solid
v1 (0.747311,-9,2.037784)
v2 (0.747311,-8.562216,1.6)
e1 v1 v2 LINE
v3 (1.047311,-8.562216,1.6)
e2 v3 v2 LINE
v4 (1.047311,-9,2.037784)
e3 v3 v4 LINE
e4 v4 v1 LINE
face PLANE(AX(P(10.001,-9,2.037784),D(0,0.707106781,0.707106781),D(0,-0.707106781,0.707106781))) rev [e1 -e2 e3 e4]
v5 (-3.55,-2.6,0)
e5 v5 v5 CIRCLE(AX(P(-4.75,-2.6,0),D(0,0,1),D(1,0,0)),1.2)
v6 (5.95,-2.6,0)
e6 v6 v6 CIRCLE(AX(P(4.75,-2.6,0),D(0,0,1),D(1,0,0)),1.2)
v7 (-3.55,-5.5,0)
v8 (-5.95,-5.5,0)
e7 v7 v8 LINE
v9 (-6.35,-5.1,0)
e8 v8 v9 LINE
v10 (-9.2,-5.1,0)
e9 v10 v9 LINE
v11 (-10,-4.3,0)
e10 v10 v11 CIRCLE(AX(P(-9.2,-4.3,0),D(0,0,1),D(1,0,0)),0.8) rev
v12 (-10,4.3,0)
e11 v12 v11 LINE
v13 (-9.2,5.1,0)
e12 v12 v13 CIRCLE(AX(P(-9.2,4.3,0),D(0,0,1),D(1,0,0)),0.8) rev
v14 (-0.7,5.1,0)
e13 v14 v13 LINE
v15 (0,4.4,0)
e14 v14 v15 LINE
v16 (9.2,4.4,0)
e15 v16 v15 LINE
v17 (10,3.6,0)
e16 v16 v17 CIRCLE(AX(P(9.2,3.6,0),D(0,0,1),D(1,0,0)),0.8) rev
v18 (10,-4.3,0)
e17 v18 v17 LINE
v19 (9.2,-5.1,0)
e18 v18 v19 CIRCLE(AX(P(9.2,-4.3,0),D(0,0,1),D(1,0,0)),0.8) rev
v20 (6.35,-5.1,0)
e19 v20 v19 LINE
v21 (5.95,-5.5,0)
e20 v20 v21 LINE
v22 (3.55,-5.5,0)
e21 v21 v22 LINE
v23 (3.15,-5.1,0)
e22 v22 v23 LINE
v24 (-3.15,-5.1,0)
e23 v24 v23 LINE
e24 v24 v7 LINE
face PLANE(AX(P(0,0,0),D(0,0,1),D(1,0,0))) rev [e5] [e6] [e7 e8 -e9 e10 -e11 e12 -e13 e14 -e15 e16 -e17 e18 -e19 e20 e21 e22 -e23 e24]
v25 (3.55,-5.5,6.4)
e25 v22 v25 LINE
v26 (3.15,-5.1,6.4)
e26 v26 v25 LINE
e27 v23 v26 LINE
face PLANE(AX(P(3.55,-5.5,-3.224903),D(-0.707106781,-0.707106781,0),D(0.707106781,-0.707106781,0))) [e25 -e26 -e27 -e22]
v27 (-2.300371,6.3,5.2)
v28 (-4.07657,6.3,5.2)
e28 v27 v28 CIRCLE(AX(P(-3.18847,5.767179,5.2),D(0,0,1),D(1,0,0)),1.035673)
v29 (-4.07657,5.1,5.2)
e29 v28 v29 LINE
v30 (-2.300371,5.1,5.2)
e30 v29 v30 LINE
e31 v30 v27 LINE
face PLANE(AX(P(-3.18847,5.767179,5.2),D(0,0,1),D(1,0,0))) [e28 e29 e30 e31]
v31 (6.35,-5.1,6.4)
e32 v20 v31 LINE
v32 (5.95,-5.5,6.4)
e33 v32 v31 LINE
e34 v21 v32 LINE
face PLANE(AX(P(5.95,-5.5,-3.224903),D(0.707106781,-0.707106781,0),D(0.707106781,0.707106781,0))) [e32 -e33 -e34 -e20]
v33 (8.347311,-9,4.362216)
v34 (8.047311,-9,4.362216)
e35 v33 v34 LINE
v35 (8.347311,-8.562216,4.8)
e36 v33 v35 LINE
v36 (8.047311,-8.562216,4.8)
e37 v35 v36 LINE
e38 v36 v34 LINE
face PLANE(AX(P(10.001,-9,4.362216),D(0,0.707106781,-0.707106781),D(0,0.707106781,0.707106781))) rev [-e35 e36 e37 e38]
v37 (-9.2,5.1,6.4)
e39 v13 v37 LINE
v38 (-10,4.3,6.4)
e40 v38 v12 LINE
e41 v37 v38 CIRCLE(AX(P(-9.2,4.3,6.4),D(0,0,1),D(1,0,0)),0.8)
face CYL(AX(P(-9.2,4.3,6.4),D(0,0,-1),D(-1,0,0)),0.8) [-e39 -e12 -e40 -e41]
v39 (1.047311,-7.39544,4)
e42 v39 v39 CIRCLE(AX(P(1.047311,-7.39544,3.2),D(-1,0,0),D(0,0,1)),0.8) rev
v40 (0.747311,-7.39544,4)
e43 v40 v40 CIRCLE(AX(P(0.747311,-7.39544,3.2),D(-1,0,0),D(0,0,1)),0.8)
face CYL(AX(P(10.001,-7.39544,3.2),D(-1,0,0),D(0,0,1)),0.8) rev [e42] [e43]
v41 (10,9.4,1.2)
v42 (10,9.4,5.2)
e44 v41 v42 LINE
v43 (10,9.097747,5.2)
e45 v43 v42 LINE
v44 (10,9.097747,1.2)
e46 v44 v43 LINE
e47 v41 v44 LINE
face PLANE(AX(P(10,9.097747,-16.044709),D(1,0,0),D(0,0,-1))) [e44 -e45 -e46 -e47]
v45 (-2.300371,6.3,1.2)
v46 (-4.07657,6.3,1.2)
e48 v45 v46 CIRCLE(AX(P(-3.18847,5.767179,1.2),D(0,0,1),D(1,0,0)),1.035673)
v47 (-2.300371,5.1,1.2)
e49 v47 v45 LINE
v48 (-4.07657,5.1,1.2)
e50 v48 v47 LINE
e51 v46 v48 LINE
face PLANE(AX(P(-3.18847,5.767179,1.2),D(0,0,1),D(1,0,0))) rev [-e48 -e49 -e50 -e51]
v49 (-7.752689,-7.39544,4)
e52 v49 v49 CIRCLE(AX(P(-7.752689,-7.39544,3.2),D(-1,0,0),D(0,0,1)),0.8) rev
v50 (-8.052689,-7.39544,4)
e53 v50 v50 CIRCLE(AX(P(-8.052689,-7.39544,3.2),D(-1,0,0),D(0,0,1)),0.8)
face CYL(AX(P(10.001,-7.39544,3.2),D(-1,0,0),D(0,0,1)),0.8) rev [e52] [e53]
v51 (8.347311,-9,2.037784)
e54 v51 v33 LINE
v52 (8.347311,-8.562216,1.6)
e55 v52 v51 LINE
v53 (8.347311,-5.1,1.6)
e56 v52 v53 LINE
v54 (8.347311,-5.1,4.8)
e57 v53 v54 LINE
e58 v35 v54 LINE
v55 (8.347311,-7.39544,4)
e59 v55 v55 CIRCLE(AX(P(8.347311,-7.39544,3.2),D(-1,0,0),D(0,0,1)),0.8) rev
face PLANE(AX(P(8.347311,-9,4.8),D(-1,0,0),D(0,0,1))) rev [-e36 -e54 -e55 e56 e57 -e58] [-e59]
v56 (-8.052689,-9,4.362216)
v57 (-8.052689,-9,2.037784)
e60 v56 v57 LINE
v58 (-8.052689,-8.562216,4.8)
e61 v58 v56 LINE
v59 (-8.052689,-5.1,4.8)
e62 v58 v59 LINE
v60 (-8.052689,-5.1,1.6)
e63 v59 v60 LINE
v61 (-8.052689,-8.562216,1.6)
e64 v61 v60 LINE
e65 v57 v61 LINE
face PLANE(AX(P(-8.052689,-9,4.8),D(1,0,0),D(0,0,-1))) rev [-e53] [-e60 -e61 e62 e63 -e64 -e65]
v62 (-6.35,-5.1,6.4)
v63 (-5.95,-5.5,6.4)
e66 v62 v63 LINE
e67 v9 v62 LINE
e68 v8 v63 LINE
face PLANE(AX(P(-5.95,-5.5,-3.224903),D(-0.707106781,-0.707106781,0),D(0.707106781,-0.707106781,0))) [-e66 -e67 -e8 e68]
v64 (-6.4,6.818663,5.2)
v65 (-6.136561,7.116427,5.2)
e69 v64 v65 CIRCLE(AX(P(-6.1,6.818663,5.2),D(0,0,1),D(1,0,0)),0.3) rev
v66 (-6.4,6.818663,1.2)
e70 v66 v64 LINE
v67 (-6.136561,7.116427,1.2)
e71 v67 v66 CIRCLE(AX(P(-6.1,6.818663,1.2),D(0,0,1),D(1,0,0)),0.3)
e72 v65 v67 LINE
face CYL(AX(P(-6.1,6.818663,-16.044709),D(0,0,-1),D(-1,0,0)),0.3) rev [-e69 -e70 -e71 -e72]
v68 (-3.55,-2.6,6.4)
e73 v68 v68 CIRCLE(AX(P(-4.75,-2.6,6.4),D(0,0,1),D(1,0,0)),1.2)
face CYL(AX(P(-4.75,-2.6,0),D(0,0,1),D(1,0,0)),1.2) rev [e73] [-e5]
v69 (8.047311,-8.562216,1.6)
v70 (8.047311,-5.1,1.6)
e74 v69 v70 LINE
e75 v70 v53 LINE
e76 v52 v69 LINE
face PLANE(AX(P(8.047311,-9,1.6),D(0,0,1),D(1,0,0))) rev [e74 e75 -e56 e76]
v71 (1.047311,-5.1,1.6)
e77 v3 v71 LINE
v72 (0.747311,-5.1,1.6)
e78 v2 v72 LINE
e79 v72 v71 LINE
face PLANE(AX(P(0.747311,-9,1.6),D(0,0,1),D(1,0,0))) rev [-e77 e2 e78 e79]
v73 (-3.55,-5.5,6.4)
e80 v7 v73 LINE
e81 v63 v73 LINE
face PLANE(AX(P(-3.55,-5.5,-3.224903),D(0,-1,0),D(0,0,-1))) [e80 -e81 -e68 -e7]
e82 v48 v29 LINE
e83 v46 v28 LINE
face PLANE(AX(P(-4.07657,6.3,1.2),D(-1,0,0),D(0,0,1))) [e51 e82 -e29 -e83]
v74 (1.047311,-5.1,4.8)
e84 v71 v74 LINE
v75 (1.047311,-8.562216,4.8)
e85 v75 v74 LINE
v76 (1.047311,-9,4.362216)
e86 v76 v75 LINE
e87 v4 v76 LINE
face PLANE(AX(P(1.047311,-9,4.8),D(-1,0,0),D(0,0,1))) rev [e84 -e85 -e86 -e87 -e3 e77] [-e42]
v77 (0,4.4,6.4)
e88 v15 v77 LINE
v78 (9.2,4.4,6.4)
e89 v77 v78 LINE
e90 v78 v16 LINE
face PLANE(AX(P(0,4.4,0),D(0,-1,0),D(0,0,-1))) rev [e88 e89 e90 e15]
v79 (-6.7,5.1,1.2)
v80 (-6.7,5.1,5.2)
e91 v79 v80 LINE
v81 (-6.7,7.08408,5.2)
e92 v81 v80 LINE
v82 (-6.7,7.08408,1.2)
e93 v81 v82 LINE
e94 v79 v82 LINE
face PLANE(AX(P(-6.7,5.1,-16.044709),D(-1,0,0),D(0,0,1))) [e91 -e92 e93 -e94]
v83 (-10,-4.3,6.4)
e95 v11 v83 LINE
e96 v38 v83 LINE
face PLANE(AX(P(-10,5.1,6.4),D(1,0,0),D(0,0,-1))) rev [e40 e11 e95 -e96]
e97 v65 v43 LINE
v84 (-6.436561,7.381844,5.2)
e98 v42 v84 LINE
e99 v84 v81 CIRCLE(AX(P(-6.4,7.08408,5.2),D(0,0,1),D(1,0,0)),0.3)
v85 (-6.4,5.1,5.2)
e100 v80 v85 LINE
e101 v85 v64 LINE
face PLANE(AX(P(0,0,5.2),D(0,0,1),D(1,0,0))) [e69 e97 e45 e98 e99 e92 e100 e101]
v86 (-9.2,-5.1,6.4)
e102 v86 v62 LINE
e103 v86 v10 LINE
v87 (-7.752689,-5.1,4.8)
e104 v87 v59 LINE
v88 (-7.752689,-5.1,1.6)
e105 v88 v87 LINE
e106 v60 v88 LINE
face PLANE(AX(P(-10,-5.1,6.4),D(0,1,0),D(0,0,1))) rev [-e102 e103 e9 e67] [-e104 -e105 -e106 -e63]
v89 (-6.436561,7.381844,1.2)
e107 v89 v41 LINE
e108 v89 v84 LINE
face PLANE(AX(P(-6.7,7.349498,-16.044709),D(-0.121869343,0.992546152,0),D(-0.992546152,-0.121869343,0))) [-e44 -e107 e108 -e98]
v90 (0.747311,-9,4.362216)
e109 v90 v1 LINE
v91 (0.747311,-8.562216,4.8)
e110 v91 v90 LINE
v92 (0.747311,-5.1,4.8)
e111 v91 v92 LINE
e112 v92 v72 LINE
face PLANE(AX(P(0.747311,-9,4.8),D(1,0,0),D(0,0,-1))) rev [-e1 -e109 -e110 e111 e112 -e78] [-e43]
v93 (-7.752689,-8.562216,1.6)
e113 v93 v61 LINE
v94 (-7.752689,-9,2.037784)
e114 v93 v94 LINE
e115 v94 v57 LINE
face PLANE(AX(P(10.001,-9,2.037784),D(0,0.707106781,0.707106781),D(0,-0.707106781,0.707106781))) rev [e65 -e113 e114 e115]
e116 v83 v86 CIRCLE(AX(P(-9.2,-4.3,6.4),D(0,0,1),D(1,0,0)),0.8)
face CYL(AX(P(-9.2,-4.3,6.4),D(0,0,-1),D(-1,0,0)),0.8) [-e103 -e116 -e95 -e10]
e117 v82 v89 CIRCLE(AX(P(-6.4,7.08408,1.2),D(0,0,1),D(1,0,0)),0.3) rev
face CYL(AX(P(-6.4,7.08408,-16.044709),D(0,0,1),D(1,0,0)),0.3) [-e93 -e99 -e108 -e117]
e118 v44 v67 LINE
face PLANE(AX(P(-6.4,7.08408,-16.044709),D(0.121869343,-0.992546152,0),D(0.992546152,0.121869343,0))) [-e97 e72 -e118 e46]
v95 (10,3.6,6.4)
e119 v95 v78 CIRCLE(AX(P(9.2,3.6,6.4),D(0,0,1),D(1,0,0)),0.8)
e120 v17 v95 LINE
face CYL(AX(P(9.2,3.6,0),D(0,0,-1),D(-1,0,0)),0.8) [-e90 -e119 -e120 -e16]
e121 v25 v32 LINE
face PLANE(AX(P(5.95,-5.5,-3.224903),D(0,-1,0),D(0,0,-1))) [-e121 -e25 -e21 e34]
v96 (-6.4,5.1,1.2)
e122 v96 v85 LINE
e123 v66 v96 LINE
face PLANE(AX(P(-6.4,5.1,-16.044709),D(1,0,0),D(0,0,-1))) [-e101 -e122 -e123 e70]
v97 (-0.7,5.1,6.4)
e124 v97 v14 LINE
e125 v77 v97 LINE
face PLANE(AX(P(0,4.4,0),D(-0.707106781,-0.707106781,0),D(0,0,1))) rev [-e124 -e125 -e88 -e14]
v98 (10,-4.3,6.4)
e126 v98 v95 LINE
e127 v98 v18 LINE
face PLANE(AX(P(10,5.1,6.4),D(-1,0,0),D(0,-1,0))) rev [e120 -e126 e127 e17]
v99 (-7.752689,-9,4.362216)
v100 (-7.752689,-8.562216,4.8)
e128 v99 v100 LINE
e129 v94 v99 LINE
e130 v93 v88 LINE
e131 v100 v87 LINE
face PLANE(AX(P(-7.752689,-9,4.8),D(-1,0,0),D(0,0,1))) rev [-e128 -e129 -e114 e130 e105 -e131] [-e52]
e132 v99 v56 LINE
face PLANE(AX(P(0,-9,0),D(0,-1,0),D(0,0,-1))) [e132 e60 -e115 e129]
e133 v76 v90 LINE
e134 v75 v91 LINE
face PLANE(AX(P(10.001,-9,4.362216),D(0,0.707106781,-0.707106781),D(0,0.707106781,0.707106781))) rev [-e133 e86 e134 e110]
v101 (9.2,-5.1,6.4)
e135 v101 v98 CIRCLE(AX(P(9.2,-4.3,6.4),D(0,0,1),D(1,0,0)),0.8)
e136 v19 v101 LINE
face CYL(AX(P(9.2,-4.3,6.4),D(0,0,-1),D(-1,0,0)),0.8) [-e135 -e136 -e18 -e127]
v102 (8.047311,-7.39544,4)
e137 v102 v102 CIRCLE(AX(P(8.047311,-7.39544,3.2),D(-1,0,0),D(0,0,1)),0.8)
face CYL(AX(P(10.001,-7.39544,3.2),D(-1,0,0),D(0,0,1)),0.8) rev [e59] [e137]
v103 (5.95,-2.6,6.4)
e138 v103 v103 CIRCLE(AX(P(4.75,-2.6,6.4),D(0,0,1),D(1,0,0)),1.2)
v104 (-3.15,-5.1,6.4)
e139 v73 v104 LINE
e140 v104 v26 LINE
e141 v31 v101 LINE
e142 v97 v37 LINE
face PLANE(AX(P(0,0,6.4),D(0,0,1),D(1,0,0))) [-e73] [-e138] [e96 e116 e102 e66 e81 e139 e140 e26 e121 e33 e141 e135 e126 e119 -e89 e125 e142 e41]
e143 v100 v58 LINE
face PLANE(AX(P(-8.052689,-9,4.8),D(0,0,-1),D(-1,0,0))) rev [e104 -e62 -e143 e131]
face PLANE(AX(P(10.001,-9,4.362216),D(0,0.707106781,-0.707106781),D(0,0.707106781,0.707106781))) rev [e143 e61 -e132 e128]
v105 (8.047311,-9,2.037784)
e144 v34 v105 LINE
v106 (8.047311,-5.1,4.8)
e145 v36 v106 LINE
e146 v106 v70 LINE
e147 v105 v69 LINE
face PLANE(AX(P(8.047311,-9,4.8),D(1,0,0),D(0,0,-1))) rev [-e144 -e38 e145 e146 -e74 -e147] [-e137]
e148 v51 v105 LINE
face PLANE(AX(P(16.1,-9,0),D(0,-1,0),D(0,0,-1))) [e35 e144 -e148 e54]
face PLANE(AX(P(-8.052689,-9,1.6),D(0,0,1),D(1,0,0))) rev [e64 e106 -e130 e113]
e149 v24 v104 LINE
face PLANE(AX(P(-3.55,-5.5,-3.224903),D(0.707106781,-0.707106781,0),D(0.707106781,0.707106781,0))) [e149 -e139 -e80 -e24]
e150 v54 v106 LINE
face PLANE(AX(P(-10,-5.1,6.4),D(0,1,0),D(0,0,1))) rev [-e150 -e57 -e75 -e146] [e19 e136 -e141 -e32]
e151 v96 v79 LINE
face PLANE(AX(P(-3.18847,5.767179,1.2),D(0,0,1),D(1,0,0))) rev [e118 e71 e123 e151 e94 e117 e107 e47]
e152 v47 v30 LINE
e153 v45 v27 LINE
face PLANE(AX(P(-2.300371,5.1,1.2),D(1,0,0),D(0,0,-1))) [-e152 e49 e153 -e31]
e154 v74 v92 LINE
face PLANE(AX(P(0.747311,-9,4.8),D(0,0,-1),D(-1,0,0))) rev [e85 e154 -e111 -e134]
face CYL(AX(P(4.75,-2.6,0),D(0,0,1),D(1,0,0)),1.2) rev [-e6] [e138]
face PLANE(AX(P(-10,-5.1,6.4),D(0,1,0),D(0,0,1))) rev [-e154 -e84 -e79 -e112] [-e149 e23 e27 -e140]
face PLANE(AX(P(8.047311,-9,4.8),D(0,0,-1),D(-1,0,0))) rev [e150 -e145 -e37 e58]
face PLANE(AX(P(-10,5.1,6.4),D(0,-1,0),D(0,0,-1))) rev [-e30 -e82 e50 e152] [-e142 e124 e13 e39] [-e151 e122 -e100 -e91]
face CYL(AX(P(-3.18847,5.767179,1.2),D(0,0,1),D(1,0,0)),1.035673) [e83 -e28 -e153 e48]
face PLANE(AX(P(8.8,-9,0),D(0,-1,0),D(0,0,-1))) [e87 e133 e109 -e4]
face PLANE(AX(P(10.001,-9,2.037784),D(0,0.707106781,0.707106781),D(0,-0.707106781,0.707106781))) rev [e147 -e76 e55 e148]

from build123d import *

# Parameters (mm, degrees)
SKETCH1_W           = 20
SKETCH1_H           = 10.2
BOSS_EXTRUDE1_DEPTH = 6.4
SKETCH2_W           = 0.3
SKETCH2_H           = 3.2
BOSS_EXTRUDE2_DEPTH = 3.9
CUT_EXTRUDE1_REACH  = 23.163
SKETCH3_R           = 0.8
LPATTERN1_COUNT     = 2
LPATTERN1_PITCH     = 8.8
LPATTERN2_COUNT     = 2
LPATTERN2_PITCH     = 16.1
SKETCH4_W           = 10
SKETCH4_H           = 6.4
CUT_EXTRUDE2_DEPTH  = 0.7
SKETCH5_R           = 1.2
CUT_EXTRUDE3_DEPTH  = 15.898322053
BOSS_EXTRUDE3_DEPTH = 6.4
CHAMFER1_SIZE       = 0.7
FILLET1_R           = 0.8
BOSS_EXTRUDE4_START = -1.2
BOSS_EXTRUDE4_DEPTH = 4
BOSS_EXTRUDE5_DEPTH = 4
FILLET2_R           = 0.3


with BuildPart() as part:
    # Sketch1 → Boss-Extrude1 (new body)
    with BuildSketch(Plane.XY):
        Rectangle(SKETCH1_W, SKETCH1_H)
    extrude(amount=BOSS_EXTRUDE1_DEPTH)

    # Sketch2 → Boss-Extrude2 (add)
    with BuildSketch(Plane.XZ.offset(5.1)):
        with Locations((-7.902688508, 3.2)):
            Rectangle(SKETCH2_W, SKETCH2_H)
    boss_extrude2 = extrude(amount=BOSS_EXTRUDE2_DEPTH)

    # Sketch3 → Cut-Extrude1 (cut, up to next)
    with BuildSketch(Plane.ZY.offset(8.052688508), mode=Mode.PRIVATE) as cut_extrude1_sk1:
        with Locations((3.2, -7.395440134)):
            Circle(SKETCH3_R)
    cut_extrude1_tool1 = extrude(cut_extrude1_sk1.sketch, amount=-CUT_EXTRUDE1_REACH, mode=Mode.PRIVATE) & part.part
    # Sketch3 → Cut-Extrude1 (cut, up to next)
    with BuildSketch(Plane.ZY.offset(8.052688508), mode=Mode.PRIVATE) as cut_extrude1_sk2:
        Polygon((4.362215953, -9), (4.8, -8.562215953), (4.8, -9), align=None)
    cut_extrude1_tool2 = extrude(cut_extrude1_sk2.sketch, amount=-CUT_EXTRUDE1_REACH, mode=Mode.PRIVATE) & part.part
    # Sketch3 → Cut-Extrude1 (cut, up to next)
    with BuildSketch(Plane.ZY.offset(8.052688508), mode=Mode.PRIVATE) as cut_extrude1_sk3:
        Polygon((2.037784047, -9), (1.6, -8.562215953), (1.6, -9), align=None)
    cut_extrude1_tool3 = extrude(cut_extrude1_sk3.sketch, amount=-CUT_EXTRUDE1_REACH, mode=Mode.PRIVATE) & part.part
    cut_extrude1_1 = cut_extrude1_tool1.solids().sort_by_distance((-8.052689, -7.39544, 3.2))[0]
    add(cut_extrude1_1, mode=Mode.SUBTRACT)
    cut_extrude1_2 = cut_extrude1_tool2.solids().sort_by_distance((-8.052689, -8.854072, 4.654072))[0]
    add(cut_extrude1_2, mode=Mode.SUBTRACT)
    cut_extrude1_3 = cut_extrude1_tool3.solids().sort_by_distance((-8.052689, -8.854072, 1.745928))[0]
    add(cut_extrude1_3, mode=Mode.SUBTRACT)
    cut_extrude1 = cut_extrude1_1 + cut_extrude1_2 + cut_extrude1_3  # Cut-Extrude1 as one shape, for the pattern or mirror that repeats it

    # LPattern1: Boss-Extrude2, Cut-Extrude1 ×2
    with Locations(*[(i * LPATTERN1_PITCH, 0, 0) for i in range(1, LPATTERN1_COUNT)]):
        add(boss_extrude2)
        add(cut_extrude1, mode=Mode.SUBTRACT)

    # LPattern2: Boss-Extrude2, Cut-Extrude1 ×2
    with Locations(*[(i * LPATTERN2_PITCH, 0, 0) for i in range(1, LPATTERN2_COUNT)]):
        add(boss_extrude2)
        add(cut_extrude1, mode=Mode.SUBTRACT)

    # Sketch4 → Cut-Extrude2 (cut)
    with BuildSketch(Plane(origin=(0, 5.1, 0), x_dir=(1, 0, 0), z_dir=(0, 1, 0))):
        with Locations((5, -3.2)):
            Rectangle(SKETCH4_W, SKETCH4_H)
    extrude(amount=-CUT_EXTRUDE2_DEPTH, mode=Mode.SUBTRACT)

    # Sketch5 → Cut-Extrude3 (cut, through all)
    with BuildSketch(Plane.XY.offset(6.4)):
        with Locations((-4.75, -2.6)):
            Circle(SKETCH5_R)
        with Locations((4.75, -2.6)):
            Circle(SKETCH5_R)
    extrude(amount=-CUT_EXTRUDE3_DEPTH, mode=Mode.SUBTRACT)

    # Sketch7 → Boss-Extrude3 (add)
    with BuildSketch(Plane.XY.offset(6.4)):
        Polygon((-3.55, -5.5), (-5.95, -5.5), (-6.35, -5.1), (-3.15, -5.1), align=None)
        Polygon((5.95, -5.5), (3.55, -5.5), (3.15, -5.1), (6.35, -5.1), align=None)
    extrude(amount=-BOSS_EXTRUDE3_DEPTH)

    # Chamfer1
    chamfer1_edges = [part.edges().sort_by_distance(p)[0] for p in [
        (0, 5.1, 3.2),
    ]]
    chamfer(chamfer1_edges, length=CHAMFER1_SIZE - 0.0001)  # a hair under: the kernel refuses the full size

    # Fillet1
    fillet1_edges = [part.edges().sort_by_distance(p)[0] for p in [
        (10, 4.4, 3.2),
        (10, -5.1, 3.2),
        (-10, -5.1, 3.2),
        (-10, 5.1, 3.2),
    ]]
    fillet(fillet1_edges, radius=FILLET1_R)

    # Sketch8 → Boss-Extrude4 (add)
    with BuildSketch(Plane.XY.offset(6.4).offset(BOSS_EXTRUDE4_START)):
        with BuildLine():
            Line((-2.300370524, 5.1), (-2.300370524, 6.3))
            ThreePointArc((-2.300370524, 6.3), (-3.188470104, 6.802852397), (-4.076569683, 6.3))
            Line((-4.076569683, 6.3), (-4.076569683, 5.1))
            Line((-4.076569683, 5.1), (-2.300370524, 5.1))
        make_face()
    extrude(amount=-BOSS_EXTRUDE4_DEPTH)

    # Sketch11 → Boss-Extrude5 (add)
    with BuildSketch(Plane.XY.offset(5.2)):
        Polygon((-6.4, 5.1), (-6.7, 5.1), (-6.7, 7.349497833), (10, 9.4), (10, 9.097747052), (-6.4, 7.084080254), align=None)
    extrude(amount=-BOSS_EXTRUDE5_DEPTH)

    # Fillet2
    fillet2_edges = [part.edges().sort_by_distance(p)[0] for p in [
        (-6.7, 7.349497833, 3.2),
        (-6.4, 7.084080254, 3.2),
    ]]
    fillet(fillet2_edges, radius=FILLET2_R)


solid = part.part
